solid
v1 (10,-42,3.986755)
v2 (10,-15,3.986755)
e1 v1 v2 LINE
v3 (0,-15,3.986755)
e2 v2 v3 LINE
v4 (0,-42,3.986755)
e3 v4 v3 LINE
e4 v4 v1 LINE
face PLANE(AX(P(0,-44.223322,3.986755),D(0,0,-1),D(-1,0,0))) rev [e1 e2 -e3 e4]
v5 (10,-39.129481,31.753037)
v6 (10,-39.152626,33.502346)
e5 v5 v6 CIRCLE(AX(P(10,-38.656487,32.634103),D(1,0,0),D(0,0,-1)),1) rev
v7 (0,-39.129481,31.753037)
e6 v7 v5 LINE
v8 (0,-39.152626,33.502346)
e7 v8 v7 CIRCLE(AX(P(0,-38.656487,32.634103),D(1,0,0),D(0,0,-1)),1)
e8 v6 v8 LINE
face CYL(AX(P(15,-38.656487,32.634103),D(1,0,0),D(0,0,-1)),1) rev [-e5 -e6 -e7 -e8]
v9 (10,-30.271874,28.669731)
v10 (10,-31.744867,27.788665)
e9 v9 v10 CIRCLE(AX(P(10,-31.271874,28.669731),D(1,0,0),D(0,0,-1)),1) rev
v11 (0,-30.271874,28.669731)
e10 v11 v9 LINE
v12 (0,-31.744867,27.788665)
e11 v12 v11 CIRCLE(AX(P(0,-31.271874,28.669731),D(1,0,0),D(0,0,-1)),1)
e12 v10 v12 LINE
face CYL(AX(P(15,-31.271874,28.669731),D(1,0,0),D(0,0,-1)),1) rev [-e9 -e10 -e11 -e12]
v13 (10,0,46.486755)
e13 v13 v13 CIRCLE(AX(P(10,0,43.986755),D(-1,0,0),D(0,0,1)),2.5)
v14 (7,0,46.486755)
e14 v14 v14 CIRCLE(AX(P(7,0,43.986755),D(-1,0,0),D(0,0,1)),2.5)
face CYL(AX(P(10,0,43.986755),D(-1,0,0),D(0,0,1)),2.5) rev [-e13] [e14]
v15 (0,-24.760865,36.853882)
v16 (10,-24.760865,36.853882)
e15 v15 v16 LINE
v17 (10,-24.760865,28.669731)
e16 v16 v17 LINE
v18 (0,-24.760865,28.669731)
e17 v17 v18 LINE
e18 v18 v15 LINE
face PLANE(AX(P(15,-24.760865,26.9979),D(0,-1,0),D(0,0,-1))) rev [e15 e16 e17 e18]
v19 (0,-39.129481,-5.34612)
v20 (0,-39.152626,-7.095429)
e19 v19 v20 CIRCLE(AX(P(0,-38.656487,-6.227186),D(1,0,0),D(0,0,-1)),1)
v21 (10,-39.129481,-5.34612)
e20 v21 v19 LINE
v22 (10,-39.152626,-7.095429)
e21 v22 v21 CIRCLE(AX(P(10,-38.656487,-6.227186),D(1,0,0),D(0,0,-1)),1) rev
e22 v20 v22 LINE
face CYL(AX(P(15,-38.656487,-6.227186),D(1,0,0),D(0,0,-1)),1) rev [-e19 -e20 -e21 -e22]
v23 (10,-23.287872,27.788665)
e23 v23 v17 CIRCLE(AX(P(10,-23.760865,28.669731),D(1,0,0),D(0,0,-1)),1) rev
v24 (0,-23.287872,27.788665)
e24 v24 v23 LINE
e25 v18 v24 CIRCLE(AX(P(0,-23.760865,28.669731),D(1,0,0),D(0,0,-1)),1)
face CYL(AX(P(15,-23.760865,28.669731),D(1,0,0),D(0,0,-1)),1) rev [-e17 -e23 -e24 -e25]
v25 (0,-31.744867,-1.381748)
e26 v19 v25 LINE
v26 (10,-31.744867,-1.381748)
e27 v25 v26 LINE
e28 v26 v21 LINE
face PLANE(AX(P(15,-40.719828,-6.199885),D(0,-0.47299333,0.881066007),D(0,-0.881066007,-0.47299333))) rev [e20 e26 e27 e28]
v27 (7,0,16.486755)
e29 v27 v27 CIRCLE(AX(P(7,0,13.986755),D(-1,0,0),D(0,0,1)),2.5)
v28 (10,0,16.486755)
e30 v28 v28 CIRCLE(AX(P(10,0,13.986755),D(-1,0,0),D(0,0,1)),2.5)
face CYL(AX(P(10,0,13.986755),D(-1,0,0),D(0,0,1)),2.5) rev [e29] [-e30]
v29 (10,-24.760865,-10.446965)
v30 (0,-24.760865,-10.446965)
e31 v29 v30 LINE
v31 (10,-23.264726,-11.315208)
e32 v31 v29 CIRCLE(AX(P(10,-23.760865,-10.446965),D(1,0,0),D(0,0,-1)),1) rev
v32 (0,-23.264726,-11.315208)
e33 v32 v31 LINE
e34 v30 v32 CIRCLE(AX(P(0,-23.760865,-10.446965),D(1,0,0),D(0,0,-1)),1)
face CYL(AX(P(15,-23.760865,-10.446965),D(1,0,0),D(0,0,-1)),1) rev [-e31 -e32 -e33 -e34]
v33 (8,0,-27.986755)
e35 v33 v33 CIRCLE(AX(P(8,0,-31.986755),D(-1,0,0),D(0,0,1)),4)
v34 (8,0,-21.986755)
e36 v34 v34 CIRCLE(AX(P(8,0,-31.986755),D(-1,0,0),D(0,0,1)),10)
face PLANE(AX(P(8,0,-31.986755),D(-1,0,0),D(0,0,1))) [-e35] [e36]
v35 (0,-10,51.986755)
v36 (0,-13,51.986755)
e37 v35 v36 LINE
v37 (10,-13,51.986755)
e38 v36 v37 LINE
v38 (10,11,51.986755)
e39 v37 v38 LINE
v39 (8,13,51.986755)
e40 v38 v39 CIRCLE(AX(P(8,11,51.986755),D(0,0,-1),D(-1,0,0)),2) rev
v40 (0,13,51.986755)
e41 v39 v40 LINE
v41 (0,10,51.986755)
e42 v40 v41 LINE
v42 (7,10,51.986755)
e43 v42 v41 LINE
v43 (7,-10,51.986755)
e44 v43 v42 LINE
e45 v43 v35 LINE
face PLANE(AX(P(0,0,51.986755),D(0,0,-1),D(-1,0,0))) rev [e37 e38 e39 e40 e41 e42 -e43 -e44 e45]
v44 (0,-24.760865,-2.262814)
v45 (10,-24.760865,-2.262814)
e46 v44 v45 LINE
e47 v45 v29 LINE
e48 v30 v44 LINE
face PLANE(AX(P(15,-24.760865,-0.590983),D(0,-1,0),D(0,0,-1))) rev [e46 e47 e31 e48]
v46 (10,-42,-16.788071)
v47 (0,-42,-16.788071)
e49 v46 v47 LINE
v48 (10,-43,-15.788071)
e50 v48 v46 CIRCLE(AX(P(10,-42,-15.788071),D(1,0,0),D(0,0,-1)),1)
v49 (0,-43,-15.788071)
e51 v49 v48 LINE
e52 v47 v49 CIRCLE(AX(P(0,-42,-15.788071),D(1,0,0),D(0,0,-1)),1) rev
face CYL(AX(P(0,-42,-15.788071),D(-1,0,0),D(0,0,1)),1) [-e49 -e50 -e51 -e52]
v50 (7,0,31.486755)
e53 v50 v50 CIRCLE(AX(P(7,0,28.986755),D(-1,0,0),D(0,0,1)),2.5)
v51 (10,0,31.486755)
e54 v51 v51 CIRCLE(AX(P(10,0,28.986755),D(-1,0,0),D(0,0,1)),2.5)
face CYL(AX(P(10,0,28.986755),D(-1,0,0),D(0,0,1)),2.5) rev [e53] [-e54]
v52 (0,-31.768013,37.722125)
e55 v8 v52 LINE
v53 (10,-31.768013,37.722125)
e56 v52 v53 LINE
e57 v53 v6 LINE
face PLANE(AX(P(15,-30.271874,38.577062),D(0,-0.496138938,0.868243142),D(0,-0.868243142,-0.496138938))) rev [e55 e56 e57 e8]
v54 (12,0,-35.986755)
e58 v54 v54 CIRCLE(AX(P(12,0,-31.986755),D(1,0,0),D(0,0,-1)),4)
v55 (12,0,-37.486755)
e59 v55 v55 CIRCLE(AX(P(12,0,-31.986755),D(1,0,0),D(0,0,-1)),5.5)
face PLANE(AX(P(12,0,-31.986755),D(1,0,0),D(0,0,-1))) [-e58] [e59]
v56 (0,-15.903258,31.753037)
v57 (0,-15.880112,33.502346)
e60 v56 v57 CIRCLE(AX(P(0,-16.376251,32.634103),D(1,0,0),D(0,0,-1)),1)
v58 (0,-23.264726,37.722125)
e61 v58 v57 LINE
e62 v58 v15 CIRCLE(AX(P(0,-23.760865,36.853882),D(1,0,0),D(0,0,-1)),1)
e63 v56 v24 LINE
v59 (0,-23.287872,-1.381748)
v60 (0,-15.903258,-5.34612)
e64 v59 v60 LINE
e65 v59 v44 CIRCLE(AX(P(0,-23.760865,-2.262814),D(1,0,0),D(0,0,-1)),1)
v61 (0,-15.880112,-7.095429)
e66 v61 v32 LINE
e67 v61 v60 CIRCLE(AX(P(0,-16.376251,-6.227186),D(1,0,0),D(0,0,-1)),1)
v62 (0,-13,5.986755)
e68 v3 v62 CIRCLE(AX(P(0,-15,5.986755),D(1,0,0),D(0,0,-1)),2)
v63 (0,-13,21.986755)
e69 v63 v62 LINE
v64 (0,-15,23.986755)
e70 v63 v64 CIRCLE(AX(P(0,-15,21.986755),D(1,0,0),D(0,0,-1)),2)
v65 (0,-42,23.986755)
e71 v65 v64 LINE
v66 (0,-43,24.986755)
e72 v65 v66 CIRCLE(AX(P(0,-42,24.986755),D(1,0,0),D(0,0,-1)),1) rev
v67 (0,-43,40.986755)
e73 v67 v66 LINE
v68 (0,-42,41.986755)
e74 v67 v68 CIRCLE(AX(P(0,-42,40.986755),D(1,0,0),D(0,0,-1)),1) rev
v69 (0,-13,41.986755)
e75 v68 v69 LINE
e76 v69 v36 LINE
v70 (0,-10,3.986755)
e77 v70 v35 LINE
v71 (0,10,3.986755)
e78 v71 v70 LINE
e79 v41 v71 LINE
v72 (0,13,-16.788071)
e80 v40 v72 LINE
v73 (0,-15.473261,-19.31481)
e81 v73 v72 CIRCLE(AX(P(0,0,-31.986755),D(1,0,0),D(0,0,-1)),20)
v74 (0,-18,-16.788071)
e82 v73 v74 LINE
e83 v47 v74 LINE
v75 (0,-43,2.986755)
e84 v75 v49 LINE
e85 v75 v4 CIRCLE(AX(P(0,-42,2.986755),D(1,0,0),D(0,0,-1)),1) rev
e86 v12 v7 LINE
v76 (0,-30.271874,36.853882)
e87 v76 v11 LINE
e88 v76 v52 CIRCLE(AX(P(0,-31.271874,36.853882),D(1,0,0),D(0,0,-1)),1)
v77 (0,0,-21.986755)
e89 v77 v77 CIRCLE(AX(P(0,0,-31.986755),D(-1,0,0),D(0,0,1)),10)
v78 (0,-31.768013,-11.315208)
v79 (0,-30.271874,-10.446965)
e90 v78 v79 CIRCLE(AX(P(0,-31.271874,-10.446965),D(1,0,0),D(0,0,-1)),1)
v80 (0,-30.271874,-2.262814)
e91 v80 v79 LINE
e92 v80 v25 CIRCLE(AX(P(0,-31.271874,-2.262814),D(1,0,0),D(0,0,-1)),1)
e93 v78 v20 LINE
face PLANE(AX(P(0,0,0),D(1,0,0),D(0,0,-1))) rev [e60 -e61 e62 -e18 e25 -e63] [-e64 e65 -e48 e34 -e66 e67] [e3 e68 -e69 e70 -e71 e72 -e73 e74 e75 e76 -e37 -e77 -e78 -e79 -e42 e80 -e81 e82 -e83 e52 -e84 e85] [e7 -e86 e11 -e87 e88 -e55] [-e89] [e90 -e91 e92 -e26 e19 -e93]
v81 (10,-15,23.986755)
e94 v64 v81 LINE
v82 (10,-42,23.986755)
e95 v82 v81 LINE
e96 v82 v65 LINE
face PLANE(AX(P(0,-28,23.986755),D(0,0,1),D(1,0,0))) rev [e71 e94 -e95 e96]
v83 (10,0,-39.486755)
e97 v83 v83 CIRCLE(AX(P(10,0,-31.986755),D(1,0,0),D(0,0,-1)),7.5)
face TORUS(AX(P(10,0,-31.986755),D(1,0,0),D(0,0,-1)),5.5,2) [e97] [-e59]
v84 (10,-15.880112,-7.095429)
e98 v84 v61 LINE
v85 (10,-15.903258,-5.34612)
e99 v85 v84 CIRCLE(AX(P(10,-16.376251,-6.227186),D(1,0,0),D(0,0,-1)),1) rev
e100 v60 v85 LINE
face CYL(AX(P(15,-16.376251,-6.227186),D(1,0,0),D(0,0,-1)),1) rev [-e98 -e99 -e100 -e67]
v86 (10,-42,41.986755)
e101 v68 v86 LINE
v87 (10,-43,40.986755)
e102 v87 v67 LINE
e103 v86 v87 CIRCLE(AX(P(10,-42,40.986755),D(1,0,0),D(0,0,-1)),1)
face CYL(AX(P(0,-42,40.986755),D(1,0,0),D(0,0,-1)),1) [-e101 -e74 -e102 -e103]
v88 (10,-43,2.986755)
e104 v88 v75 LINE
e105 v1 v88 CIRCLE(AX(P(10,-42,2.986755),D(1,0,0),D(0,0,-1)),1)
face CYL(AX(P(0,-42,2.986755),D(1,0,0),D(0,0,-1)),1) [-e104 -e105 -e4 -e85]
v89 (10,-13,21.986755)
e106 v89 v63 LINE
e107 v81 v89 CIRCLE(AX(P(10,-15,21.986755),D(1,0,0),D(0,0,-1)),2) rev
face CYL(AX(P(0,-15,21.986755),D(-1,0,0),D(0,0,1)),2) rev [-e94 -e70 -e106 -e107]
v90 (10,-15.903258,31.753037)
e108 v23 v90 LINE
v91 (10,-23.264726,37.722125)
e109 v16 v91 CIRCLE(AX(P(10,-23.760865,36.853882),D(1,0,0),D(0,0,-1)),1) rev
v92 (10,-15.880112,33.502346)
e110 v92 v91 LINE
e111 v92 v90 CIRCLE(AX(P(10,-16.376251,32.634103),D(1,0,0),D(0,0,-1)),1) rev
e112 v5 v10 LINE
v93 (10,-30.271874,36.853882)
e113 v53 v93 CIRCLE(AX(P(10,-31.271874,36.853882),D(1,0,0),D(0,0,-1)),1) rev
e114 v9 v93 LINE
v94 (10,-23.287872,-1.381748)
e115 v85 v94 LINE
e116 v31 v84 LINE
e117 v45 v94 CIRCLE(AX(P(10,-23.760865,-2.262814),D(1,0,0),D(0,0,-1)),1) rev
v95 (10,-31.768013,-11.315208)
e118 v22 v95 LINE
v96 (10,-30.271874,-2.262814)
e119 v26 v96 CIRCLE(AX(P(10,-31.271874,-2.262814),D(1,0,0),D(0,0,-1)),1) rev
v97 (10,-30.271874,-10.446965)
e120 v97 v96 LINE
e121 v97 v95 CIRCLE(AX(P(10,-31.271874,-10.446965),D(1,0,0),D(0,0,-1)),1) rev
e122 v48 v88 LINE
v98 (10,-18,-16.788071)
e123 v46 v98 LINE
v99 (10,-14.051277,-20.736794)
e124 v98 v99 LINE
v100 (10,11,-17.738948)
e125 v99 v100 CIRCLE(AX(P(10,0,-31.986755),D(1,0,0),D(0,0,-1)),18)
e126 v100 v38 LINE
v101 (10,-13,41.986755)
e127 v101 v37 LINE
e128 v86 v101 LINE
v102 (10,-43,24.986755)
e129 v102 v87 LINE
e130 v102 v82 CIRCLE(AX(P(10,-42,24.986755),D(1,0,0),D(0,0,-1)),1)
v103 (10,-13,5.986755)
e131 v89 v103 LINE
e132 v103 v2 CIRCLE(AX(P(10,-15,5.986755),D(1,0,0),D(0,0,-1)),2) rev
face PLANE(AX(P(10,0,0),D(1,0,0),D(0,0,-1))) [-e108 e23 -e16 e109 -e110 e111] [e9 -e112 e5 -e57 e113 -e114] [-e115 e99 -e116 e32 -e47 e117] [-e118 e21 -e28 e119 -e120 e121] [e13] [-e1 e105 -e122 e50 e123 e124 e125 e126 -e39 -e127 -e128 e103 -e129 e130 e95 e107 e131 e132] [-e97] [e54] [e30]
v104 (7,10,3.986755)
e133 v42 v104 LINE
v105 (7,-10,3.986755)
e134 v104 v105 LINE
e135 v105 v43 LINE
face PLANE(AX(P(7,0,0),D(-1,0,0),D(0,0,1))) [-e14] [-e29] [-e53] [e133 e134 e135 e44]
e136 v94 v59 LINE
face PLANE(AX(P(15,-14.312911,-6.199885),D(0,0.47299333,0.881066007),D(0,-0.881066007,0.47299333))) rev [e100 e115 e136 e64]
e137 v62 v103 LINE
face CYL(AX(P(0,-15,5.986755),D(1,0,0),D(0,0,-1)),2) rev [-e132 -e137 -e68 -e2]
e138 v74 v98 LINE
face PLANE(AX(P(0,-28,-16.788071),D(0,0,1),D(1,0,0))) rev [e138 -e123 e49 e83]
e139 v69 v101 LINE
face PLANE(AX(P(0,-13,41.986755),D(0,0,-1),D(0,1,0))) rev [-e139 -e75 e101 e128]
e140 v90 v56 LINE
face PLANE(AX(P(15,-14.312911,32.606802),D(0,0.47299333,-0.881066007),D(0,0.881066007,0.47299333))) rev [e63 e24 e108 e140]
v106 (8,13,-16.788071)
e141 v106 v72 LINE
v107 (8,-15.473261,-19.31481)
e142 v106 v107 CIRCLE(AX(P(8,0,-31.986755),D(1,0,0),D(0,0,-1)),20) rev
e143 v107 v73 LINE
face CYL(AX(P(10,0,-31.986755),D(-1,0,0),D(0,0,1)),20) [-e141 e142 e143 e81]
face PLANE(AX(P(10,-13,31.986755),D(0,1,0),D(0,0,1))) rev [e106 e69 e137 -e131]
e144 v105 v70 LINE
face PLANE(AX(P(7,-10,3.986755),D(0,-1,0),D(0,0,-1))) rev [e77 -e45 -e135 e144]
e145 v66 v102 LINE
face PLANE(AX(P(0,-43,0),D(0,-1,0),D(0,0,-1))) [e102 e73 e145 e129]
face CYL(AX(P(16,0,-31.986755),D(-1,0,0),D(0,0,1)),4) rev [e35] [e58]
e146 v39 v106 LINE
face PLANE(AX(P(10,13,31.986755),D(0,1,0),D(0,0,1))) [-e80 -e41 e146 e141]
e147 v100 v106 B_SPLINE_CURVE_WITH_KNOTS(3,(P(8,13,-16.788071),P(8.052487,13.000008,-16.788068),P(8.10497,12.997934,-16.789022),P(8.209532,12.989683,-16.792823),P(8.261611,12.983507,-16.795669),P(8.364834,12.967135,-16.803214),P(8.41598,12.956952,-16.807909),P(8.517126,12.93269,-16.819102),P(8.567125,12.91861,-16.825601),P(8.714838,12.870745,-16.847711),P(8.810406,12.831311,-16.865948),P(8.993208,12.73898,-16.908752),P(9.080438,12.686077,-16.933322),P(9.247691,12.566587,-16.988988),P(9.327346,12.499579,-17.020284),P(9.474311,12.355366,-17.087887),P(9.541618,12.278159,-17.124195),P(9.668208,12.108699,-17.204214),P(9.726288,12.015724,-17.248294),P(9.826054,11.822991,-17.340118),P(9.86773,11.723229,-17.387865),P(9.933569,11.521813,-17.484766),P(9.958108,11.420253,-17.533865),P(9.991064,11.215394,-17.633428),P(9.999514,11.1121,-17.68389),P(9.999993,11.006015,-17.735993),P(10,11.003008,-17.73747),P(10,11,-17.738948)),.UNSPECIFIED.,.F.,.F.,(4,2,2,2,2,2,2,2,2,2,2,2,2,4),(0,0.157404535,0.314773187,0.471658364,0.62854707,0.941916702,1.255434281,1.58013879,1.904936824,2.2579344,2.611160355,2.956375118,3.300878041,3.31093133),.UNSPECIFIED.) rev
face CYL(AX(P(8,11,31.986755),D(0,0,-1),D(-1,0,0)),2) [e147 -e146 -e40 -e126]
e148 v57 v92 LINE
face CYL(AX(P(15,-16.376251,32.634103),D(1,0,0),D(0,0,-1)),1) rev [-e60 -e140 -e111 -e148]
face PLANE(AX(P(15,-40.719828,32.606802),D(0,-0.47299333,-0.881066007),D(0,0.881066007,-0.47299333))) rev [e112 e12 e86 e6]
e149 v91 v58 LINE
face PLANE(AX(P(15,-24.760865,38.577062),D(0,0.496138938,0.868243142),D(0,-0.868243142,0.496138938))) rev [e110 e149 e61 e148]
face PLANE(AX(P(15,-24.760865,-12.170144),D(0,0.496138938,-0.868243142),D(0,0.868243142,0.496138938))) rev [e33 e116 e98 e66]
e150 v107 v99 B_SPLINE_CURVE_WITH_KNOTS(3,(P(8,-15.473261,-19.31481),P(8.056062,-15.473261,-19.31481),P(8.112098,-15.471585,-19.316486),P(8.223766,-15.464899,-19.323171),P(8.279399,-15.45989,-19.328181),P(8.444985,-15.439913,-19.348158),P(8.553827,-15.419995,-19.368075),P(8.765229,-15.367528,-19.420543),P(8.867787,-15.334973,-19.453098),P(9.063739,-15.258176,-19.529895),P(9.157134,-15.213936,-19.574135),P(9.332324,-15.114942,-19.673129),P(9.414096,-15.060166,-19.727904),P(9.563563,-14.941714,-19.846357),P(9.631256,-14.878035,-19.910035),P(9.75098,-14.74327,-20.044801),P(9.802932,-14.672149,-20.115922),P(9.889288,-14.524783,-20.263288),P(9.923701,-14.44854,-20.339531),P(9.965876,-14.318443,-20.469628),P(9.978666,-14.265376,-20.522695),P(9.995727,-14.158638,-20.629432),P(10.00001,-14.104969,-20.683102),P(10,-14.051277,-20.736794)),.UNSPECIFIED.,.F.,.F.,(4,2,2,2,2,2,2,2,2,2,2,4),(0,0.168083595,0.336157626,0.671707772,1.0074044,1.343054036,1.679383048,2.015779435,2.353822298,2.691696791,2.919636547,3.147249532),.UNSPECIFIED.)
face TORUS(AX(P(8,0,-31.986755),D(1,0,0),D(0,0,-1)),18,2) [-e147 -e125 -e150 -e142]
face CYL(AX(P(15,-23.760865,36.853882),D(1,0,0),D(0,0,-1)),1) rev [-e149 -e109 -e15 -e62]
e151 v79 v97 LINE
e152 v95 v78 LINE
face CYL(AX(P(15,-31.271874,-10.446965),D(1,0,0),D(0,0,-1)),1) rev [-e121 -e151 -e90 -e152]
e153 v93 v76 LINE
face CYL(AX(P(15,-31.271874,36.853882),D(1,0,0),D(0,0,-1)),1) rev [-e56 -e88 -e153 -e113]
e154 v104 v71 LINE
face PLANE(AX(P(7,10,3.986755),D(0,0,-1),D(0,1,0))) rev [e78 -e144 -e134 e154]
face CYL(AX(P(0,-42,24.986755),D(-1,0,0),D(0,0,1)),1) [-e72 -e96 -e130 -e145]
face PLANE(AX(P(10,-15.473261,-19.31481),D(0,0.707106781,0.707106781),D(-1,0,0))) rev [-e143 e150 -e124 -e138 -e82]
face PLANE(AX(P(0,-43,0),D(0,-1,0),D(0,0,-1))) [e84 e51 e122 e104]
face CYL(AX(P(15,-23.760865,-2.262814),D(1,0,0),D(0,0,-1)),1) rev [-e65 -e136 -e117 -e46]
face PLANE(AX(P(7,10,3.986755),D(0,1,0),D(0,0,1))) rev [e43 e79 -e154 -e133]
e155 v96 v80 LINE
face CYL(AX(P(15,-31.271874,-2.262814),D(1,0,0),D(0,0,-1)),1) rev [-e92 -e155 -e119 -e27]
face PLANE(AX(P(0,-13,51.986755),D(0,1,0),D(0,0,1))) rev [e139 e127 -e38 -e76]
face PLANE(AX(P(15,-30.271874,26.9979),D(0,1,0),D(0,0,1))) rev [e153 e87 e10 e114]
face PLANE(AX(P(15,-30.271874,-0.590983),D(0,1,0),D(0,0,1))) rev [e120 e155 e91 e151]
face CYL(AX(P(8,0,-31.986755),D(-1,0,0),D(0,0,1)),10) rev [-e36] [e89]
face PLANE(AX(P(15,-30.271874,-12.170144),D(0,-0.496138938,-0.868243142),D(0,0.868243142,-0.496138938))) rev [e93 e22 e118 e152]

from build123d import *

# Parameters (mm, degrees)
SKETCH_1_R           = 20
SKETCH_1_W           = 63.973509934
SKETCH_1_H           = 26
EXTRUDE_1_DEPTH      = 10
SKETCH_2_W           = 45
SKETCH_2_H           = 20
CUT_EXTRUDE_1_DEPTH  = 7
SKETCH_3_R           = 10
CUT_EXTRUDE_2_DEPTH  = 8
SKETCH_4_R           = 4
CUT_EXTRUDE_3_DEPTH  = 7
SKETCH_6_W           = 10
SKETCH_6_H           = 8
EXTRUDE_2_DEPTH      = 15
CHAMFER_2_SIZE       = 5
EXTRUDE_3_DEPTH      = 20
SKETCH_8_W           = 10
SKETCH_8_H           = 12.77482578
EXTRUDE_4_DEPTH      = 15
SKETCH_9_W           = 7
SKETCH_9_H           = 20
EXTRUDE_5_DEPTH      = 10
SKETCH_10_W          = 7
SKETCH_10_H          = 20
EXTRUDE_6_DEPTH      = 7
SKETCH_11_W          = 10
SKETCH_11_H          = 15
CUT_EXTRUDE_5_DEPTH  = 60.88841868
SKETCH_12_R          = 10
SKETCH_12_W          = 48
SKETCH_12_H          = 20
EXTRUDE_7_DEPTH      = 10
SKETCH_13_R          = 10
CUT_EXTRUDE_6_DEPTH  = 8
SKETCH_14_R          = 4
CUT_EXTRUDE_7_DEPTH  = 8
SKETCH_15_W          = 48
SKETCH_15_H          = 20
CUT_EXTRUDE_8_DEPTH  = 7
SKETCH_16_W          = 10
SKETCH_16_H          = 18
SKETCH_16_H_2        = 20.77482578
EXTRUDE_8_DEPTH      = 15
CUT_EXTRUDE_9_DEPTH  = 15
FILLET_1_R           = 1
FILLET_2_R           = 2
SKETCH_18_R          = 7.5
SKETCH_18_R_2        = 4
EXTRUDE_9_DEPTH      = 2
FILLET_3_R           = 2
SKETCH_19_R          = 2.5
CUT_EXTRUDE_10_DEPTH = 3


# Some blends are built 0.0001 mm under size
with BuildPart() as part:
    # 草图1 → 凸台-拉伸1 (new body)
    with BuildSketch(Plane(origin=(0, 0, 0), x_dir=(0, 0, -1), z_dir=(1, 0, 0))):
        with Locations((31.986754967, 0)):
            Circle(SKETCH_1_R)
        Rectangle(SKETCH_1_W, SKETCH_1_H)
    extrude(amount=EXTRUDE_1_DEPTH)

    # 草图2 → 切除-拉伸1 (cut)
    with BuildSketch(Plane(origin=(10, 0, 0), x_dir=(0, 0, -1), z_dir=(1, 0, 0))):
        with Locations((-9.486754967, 0)):
            Rectangle(SKETCH_2_W, SKETCH_2_H)
    extrude(amount=-CUT_EXTRUDE_1_DEPTH, mode=Mode.SUBTRACT)

    # 草图3 → 切除-拉伸2 (cut)
    with BuildSketch(Plane(origin=(10, 0, 0), x_dir=(0, 0, -1), z_dir=(1, 0, 0))):
        with Locations((31.986754967, 0)):
            Circle(SKETCH_3_R)
    extrude(amount=-CUT_EXTRUDE_2_DEPTH, mode=Mode.SUBTRACT)

    # 草图4 → 切除-拉伸3 (cut)
    with BuildSketch(Plane(origin=(2, 0, 0), x_dir=(0, 0, -1), z_dir=(1, 0, 0))):
        with Locations((31.986754967, 0)):
            Circle(SKETCH_4_R)
    extrude(amount=-CUT_EXTRUDE_3_DEPTH, mode=Mode.SUBTRACT)

    # 草图6 → 凸台-拉伸2 (add)
    with BuildSketch(Plane.XZ.offset(13)):
        with Locations((5, -12.788070813)):
            Rectangle(SKETCH_6_W, SKETCH_6_H)
        with Locations((5, 27.986754967)):
            Rectangle(SKETCH_6_W, SKETCH_6_H)
    extrude(amount=EXTRUDE_2_DEPTH)

    # 倒角2
    # the kernel refuses this chamfer: 5, 3.546264764 mm, written as the material it adds along each edge
    with BuildSketch(Plane(origin=(10, -13, -16.788070813), x_dir=(0, -0.6995038411281902, -0.7146288381019251), z_dir=(-1, 0, 0))) as chamfer_2_piece_1:
        with BuildLine():
            Line((3.535736125, 0), (CHAMFER_2_SIZE * 0.699503841128, CHAMFER_2_SIZE * 0.714628838102))
            Line((CHAMFER_2_SIZE * 0.699503841128, CHAMFER_2_SIZE * 0.714628838102), (0, 0))
            ThreePointArc((0, 0), (1.768947181, 0.07828713), (3.535736125, 0))
        make_face()
    extrude(amount=10)

    # 草图7 → 凸台-拉伸3 (add)
    with BuildSketch(Plane.XY.offset(31.986754967)):
        Polygon((3, -10), (3, 10), (10, 10), (10, 13), (0, 13), (0, -28), (10, -28), (10, -10), align=None)
    extrude(amount=EXTRUDE_3_DEPTH)

    # 草图8 → 凸台-拉伸4 (add)
    with BuildSketch(Plane.XZ.offset(13)):
        with Locations((5, -2.400657923)):
            Rectangle(SKETCH_8_W, SKETCH_8_H)
    extrude(amount=EXTRUDE_4_DEPTH)

    # 草图9 → 凸台-拉伸5 (add)
    with BuildSketch(Plane.XY.offset(-13.013245033)):
        with Locations((6.5, 0)):
            Rectangle(SKETCH_9_W, SKETCH_9_H)
    extrude(amount=EXTRUDE_5_DEPTH)

    # 草图10 → 凸台-拉伸6 (add)
    with BuildSketch(Plane.XY.offset(-3.013245033)):
        with Locations((6.5, 0)):
            Rectangle(SKETCH_10_W, SKETCH_10_H)
    extrude(amount=EXTRUDE_6_DEPTH)

    # 草图11 → 切除-拉伸5 (cut, through all)
    with BuildSketch(Plane(origin=(10, 0, 0), x_dir=(0, 0, -1), z_dir=(1, 0, 0))):
        with Locations((-46.986754967, -20.5)):
            Rectangle(SKETCH_11_W, SKETCH_11_H)
    extrude(amount=-CUT_EXTRUDE_5_DEPTH, mode=Mode.SUBTRACT)

    # 草图12 → 凸台-拉伸7 (add)
    with BuildSketch(Plane(origin=(10, 0, 0), x_dir=(0, 0, -1), z_dir=(1, 0, 0))):
        with Locations((31.986754967, 0)):
            Circle(SKETCH_12_R)
        with Locations((-27.986754967, 0)):
            Rectangle(SKETCH_12_W, SKETCH_12_H)
    extrude(amount=-EXTRUDE_7_DEPTH)

    # 草图13 → 切除-拉伸6 (cut)
    with BuildSketch(Plane.ZY):
        with Locations((-31.986754967, 0)):
            Circle(SKETCH_13_R)
    extrude(amount=-CUT_EXTRUDE_6_DEPTH, mode=Mode.SUBTRACT)

    # 草图14 → 切除-拉伸7 (cut)
    with BuildSketch(Plane.ZY.offset(-8)):
        with Locations((-31.986754967, 0)):
            Circle(SKETCH_14_R)
    extrude(amount=-CUT_EXTRUDE_7_DEPTH, mode=Mode.SUBTRACT)

    # 草图15 → 切除-拉伸8 (cut)
    with BuildSketch(Plane.ZY):
        with Locations((27.986754967, 0)):
            Rectangle(SKETCH_15_W, SKETCH_15_H)
    extrude(amount=-CUT_EXTRUDE_8_DEPTH, mode=Mode.SUBTRACT)

    # 草图16 → 凸台-拉伸8 (add)
    with BuildSketch(Plane.XZ.offset(28)):
        with Locations((5, 32.986754967)):
            Rectangle(SKETCH_16_W, SKETCH_16_H)
        with Locations((5, -6.400657923)):
            Rectangle(SKETCH_16_W, SKETCH_16_H_2)
    extrude(amount=EXTRUDE_8_DEPTH)

    # 草图17 → 切除-拉伸9 (cut)
    with BuildSketch(Plane.ZY):
        Polygon((-0.590983184, -30.271873826), (-12.170144499, -30.271873826), (-6.199884933, -40.719828065), align=None)
        Polygon((-6.199884933, -14.312910757), (-0.590983184, -24.760864996), (-12.170144499, -24.760864996), align=None)
        Polygon((26.997900492, -24.760864996), (38.577061807, -24.760864996), (32.606802242, -14.312910757), align=None)
        Polygon((32.606802242, -40.719828065), (26.997900492, -30.271873826), (38.577061807, -30.271873826), align=None)
    extrude(amount=-CUT_EXTRUDE_9_DEPTH, mode=Mode.SUBTRACT)

    # 圆角1
    fillet_1_edges = [part.edges().sort_by_distance(p)[0] for p in [
        (5, -43, 41.986754967),
        (5, -43, 23.986754967),
        (5, -43, 3.986754967),
        (5, -43, -16.788070813),
        (5, -30.271873826, 38.577061807),
        (5, -40.719828065, 32.606802242),
        (5, -30.271873826, 26.997900492),
        (5, -24.760864996, 26.997900492),
        (5, -14.312910757, 32.606802242),
        (5, -24.760864996, 38.577061807),
        (5, -24.760864996, -12.170144499),
        (5, -14.312910757, -6.199884933),
        (5, -24.760864996, -0.590983184),
        (5, -30.271873826, -0.590983184),
        (5, -40.719828065, -6.199884933),
        (5, -30.271873826, -12.170144499),
    ]]
    fillet(fillet_1_edges, radius=FILLET_1_R)

    # 圆角2
    fillet_2_edges = [part.edges().sort_by_distance(p)[0] for p in [
        (5, -13, 3.986754967),
        (10, 13, 17.599342077),
        (5, -13, 23.986754967),
        (10, 1.767868063, -51.908467808),
    ]]
    fillet(fillet_2_edges, radius=FILLET_2_R)

    # 草图18 → 凸台-拉伸9 (add)
    with BuildSketch(Plane(origin=(10, 0, 0), x_dir=(0, 0, -1), z_dir=(1, 0, 0))):
        with Locations((31.986754967, 0)):
            Circle(SKETCH_18_R)
        with Locations(Location((31.986754967, 0, 0), (0, 0, 180))):
            Circle(SKETCH_18_R_2, mode=Mode.SUBTRACT)
    extrude(amount=EXTRUDE_9_DEPTH)

    # 圆角3
    fillet_3_edges = [part.edges().sort_by_distance(p)[0] for p in [
        (12, 0, -24.486754967),
    ]]
    fillet(fillet_3_edges, radius=FILLET_3_R - 0.0001)  # a hair under: the kernel refuses the full size

    # 草图19 → 切除-拉伸10 (cut)
    with BuildSketch(Plane.ZY.offset(-7)):
        with Locations((43.986754967, 0)):
            Circle(SKETCH_19_R)
        with Locations((28.986754967, 0)):
            Circle(SKETCH_19_R)
        with Locations((13.986754967, 0)):
            Circle(SKETCH_19_R)
    extrude(amount=-CUT_EXTRUDE_10_DEPTH, mode=Mode.SUBTRACT)


solid = part.part
